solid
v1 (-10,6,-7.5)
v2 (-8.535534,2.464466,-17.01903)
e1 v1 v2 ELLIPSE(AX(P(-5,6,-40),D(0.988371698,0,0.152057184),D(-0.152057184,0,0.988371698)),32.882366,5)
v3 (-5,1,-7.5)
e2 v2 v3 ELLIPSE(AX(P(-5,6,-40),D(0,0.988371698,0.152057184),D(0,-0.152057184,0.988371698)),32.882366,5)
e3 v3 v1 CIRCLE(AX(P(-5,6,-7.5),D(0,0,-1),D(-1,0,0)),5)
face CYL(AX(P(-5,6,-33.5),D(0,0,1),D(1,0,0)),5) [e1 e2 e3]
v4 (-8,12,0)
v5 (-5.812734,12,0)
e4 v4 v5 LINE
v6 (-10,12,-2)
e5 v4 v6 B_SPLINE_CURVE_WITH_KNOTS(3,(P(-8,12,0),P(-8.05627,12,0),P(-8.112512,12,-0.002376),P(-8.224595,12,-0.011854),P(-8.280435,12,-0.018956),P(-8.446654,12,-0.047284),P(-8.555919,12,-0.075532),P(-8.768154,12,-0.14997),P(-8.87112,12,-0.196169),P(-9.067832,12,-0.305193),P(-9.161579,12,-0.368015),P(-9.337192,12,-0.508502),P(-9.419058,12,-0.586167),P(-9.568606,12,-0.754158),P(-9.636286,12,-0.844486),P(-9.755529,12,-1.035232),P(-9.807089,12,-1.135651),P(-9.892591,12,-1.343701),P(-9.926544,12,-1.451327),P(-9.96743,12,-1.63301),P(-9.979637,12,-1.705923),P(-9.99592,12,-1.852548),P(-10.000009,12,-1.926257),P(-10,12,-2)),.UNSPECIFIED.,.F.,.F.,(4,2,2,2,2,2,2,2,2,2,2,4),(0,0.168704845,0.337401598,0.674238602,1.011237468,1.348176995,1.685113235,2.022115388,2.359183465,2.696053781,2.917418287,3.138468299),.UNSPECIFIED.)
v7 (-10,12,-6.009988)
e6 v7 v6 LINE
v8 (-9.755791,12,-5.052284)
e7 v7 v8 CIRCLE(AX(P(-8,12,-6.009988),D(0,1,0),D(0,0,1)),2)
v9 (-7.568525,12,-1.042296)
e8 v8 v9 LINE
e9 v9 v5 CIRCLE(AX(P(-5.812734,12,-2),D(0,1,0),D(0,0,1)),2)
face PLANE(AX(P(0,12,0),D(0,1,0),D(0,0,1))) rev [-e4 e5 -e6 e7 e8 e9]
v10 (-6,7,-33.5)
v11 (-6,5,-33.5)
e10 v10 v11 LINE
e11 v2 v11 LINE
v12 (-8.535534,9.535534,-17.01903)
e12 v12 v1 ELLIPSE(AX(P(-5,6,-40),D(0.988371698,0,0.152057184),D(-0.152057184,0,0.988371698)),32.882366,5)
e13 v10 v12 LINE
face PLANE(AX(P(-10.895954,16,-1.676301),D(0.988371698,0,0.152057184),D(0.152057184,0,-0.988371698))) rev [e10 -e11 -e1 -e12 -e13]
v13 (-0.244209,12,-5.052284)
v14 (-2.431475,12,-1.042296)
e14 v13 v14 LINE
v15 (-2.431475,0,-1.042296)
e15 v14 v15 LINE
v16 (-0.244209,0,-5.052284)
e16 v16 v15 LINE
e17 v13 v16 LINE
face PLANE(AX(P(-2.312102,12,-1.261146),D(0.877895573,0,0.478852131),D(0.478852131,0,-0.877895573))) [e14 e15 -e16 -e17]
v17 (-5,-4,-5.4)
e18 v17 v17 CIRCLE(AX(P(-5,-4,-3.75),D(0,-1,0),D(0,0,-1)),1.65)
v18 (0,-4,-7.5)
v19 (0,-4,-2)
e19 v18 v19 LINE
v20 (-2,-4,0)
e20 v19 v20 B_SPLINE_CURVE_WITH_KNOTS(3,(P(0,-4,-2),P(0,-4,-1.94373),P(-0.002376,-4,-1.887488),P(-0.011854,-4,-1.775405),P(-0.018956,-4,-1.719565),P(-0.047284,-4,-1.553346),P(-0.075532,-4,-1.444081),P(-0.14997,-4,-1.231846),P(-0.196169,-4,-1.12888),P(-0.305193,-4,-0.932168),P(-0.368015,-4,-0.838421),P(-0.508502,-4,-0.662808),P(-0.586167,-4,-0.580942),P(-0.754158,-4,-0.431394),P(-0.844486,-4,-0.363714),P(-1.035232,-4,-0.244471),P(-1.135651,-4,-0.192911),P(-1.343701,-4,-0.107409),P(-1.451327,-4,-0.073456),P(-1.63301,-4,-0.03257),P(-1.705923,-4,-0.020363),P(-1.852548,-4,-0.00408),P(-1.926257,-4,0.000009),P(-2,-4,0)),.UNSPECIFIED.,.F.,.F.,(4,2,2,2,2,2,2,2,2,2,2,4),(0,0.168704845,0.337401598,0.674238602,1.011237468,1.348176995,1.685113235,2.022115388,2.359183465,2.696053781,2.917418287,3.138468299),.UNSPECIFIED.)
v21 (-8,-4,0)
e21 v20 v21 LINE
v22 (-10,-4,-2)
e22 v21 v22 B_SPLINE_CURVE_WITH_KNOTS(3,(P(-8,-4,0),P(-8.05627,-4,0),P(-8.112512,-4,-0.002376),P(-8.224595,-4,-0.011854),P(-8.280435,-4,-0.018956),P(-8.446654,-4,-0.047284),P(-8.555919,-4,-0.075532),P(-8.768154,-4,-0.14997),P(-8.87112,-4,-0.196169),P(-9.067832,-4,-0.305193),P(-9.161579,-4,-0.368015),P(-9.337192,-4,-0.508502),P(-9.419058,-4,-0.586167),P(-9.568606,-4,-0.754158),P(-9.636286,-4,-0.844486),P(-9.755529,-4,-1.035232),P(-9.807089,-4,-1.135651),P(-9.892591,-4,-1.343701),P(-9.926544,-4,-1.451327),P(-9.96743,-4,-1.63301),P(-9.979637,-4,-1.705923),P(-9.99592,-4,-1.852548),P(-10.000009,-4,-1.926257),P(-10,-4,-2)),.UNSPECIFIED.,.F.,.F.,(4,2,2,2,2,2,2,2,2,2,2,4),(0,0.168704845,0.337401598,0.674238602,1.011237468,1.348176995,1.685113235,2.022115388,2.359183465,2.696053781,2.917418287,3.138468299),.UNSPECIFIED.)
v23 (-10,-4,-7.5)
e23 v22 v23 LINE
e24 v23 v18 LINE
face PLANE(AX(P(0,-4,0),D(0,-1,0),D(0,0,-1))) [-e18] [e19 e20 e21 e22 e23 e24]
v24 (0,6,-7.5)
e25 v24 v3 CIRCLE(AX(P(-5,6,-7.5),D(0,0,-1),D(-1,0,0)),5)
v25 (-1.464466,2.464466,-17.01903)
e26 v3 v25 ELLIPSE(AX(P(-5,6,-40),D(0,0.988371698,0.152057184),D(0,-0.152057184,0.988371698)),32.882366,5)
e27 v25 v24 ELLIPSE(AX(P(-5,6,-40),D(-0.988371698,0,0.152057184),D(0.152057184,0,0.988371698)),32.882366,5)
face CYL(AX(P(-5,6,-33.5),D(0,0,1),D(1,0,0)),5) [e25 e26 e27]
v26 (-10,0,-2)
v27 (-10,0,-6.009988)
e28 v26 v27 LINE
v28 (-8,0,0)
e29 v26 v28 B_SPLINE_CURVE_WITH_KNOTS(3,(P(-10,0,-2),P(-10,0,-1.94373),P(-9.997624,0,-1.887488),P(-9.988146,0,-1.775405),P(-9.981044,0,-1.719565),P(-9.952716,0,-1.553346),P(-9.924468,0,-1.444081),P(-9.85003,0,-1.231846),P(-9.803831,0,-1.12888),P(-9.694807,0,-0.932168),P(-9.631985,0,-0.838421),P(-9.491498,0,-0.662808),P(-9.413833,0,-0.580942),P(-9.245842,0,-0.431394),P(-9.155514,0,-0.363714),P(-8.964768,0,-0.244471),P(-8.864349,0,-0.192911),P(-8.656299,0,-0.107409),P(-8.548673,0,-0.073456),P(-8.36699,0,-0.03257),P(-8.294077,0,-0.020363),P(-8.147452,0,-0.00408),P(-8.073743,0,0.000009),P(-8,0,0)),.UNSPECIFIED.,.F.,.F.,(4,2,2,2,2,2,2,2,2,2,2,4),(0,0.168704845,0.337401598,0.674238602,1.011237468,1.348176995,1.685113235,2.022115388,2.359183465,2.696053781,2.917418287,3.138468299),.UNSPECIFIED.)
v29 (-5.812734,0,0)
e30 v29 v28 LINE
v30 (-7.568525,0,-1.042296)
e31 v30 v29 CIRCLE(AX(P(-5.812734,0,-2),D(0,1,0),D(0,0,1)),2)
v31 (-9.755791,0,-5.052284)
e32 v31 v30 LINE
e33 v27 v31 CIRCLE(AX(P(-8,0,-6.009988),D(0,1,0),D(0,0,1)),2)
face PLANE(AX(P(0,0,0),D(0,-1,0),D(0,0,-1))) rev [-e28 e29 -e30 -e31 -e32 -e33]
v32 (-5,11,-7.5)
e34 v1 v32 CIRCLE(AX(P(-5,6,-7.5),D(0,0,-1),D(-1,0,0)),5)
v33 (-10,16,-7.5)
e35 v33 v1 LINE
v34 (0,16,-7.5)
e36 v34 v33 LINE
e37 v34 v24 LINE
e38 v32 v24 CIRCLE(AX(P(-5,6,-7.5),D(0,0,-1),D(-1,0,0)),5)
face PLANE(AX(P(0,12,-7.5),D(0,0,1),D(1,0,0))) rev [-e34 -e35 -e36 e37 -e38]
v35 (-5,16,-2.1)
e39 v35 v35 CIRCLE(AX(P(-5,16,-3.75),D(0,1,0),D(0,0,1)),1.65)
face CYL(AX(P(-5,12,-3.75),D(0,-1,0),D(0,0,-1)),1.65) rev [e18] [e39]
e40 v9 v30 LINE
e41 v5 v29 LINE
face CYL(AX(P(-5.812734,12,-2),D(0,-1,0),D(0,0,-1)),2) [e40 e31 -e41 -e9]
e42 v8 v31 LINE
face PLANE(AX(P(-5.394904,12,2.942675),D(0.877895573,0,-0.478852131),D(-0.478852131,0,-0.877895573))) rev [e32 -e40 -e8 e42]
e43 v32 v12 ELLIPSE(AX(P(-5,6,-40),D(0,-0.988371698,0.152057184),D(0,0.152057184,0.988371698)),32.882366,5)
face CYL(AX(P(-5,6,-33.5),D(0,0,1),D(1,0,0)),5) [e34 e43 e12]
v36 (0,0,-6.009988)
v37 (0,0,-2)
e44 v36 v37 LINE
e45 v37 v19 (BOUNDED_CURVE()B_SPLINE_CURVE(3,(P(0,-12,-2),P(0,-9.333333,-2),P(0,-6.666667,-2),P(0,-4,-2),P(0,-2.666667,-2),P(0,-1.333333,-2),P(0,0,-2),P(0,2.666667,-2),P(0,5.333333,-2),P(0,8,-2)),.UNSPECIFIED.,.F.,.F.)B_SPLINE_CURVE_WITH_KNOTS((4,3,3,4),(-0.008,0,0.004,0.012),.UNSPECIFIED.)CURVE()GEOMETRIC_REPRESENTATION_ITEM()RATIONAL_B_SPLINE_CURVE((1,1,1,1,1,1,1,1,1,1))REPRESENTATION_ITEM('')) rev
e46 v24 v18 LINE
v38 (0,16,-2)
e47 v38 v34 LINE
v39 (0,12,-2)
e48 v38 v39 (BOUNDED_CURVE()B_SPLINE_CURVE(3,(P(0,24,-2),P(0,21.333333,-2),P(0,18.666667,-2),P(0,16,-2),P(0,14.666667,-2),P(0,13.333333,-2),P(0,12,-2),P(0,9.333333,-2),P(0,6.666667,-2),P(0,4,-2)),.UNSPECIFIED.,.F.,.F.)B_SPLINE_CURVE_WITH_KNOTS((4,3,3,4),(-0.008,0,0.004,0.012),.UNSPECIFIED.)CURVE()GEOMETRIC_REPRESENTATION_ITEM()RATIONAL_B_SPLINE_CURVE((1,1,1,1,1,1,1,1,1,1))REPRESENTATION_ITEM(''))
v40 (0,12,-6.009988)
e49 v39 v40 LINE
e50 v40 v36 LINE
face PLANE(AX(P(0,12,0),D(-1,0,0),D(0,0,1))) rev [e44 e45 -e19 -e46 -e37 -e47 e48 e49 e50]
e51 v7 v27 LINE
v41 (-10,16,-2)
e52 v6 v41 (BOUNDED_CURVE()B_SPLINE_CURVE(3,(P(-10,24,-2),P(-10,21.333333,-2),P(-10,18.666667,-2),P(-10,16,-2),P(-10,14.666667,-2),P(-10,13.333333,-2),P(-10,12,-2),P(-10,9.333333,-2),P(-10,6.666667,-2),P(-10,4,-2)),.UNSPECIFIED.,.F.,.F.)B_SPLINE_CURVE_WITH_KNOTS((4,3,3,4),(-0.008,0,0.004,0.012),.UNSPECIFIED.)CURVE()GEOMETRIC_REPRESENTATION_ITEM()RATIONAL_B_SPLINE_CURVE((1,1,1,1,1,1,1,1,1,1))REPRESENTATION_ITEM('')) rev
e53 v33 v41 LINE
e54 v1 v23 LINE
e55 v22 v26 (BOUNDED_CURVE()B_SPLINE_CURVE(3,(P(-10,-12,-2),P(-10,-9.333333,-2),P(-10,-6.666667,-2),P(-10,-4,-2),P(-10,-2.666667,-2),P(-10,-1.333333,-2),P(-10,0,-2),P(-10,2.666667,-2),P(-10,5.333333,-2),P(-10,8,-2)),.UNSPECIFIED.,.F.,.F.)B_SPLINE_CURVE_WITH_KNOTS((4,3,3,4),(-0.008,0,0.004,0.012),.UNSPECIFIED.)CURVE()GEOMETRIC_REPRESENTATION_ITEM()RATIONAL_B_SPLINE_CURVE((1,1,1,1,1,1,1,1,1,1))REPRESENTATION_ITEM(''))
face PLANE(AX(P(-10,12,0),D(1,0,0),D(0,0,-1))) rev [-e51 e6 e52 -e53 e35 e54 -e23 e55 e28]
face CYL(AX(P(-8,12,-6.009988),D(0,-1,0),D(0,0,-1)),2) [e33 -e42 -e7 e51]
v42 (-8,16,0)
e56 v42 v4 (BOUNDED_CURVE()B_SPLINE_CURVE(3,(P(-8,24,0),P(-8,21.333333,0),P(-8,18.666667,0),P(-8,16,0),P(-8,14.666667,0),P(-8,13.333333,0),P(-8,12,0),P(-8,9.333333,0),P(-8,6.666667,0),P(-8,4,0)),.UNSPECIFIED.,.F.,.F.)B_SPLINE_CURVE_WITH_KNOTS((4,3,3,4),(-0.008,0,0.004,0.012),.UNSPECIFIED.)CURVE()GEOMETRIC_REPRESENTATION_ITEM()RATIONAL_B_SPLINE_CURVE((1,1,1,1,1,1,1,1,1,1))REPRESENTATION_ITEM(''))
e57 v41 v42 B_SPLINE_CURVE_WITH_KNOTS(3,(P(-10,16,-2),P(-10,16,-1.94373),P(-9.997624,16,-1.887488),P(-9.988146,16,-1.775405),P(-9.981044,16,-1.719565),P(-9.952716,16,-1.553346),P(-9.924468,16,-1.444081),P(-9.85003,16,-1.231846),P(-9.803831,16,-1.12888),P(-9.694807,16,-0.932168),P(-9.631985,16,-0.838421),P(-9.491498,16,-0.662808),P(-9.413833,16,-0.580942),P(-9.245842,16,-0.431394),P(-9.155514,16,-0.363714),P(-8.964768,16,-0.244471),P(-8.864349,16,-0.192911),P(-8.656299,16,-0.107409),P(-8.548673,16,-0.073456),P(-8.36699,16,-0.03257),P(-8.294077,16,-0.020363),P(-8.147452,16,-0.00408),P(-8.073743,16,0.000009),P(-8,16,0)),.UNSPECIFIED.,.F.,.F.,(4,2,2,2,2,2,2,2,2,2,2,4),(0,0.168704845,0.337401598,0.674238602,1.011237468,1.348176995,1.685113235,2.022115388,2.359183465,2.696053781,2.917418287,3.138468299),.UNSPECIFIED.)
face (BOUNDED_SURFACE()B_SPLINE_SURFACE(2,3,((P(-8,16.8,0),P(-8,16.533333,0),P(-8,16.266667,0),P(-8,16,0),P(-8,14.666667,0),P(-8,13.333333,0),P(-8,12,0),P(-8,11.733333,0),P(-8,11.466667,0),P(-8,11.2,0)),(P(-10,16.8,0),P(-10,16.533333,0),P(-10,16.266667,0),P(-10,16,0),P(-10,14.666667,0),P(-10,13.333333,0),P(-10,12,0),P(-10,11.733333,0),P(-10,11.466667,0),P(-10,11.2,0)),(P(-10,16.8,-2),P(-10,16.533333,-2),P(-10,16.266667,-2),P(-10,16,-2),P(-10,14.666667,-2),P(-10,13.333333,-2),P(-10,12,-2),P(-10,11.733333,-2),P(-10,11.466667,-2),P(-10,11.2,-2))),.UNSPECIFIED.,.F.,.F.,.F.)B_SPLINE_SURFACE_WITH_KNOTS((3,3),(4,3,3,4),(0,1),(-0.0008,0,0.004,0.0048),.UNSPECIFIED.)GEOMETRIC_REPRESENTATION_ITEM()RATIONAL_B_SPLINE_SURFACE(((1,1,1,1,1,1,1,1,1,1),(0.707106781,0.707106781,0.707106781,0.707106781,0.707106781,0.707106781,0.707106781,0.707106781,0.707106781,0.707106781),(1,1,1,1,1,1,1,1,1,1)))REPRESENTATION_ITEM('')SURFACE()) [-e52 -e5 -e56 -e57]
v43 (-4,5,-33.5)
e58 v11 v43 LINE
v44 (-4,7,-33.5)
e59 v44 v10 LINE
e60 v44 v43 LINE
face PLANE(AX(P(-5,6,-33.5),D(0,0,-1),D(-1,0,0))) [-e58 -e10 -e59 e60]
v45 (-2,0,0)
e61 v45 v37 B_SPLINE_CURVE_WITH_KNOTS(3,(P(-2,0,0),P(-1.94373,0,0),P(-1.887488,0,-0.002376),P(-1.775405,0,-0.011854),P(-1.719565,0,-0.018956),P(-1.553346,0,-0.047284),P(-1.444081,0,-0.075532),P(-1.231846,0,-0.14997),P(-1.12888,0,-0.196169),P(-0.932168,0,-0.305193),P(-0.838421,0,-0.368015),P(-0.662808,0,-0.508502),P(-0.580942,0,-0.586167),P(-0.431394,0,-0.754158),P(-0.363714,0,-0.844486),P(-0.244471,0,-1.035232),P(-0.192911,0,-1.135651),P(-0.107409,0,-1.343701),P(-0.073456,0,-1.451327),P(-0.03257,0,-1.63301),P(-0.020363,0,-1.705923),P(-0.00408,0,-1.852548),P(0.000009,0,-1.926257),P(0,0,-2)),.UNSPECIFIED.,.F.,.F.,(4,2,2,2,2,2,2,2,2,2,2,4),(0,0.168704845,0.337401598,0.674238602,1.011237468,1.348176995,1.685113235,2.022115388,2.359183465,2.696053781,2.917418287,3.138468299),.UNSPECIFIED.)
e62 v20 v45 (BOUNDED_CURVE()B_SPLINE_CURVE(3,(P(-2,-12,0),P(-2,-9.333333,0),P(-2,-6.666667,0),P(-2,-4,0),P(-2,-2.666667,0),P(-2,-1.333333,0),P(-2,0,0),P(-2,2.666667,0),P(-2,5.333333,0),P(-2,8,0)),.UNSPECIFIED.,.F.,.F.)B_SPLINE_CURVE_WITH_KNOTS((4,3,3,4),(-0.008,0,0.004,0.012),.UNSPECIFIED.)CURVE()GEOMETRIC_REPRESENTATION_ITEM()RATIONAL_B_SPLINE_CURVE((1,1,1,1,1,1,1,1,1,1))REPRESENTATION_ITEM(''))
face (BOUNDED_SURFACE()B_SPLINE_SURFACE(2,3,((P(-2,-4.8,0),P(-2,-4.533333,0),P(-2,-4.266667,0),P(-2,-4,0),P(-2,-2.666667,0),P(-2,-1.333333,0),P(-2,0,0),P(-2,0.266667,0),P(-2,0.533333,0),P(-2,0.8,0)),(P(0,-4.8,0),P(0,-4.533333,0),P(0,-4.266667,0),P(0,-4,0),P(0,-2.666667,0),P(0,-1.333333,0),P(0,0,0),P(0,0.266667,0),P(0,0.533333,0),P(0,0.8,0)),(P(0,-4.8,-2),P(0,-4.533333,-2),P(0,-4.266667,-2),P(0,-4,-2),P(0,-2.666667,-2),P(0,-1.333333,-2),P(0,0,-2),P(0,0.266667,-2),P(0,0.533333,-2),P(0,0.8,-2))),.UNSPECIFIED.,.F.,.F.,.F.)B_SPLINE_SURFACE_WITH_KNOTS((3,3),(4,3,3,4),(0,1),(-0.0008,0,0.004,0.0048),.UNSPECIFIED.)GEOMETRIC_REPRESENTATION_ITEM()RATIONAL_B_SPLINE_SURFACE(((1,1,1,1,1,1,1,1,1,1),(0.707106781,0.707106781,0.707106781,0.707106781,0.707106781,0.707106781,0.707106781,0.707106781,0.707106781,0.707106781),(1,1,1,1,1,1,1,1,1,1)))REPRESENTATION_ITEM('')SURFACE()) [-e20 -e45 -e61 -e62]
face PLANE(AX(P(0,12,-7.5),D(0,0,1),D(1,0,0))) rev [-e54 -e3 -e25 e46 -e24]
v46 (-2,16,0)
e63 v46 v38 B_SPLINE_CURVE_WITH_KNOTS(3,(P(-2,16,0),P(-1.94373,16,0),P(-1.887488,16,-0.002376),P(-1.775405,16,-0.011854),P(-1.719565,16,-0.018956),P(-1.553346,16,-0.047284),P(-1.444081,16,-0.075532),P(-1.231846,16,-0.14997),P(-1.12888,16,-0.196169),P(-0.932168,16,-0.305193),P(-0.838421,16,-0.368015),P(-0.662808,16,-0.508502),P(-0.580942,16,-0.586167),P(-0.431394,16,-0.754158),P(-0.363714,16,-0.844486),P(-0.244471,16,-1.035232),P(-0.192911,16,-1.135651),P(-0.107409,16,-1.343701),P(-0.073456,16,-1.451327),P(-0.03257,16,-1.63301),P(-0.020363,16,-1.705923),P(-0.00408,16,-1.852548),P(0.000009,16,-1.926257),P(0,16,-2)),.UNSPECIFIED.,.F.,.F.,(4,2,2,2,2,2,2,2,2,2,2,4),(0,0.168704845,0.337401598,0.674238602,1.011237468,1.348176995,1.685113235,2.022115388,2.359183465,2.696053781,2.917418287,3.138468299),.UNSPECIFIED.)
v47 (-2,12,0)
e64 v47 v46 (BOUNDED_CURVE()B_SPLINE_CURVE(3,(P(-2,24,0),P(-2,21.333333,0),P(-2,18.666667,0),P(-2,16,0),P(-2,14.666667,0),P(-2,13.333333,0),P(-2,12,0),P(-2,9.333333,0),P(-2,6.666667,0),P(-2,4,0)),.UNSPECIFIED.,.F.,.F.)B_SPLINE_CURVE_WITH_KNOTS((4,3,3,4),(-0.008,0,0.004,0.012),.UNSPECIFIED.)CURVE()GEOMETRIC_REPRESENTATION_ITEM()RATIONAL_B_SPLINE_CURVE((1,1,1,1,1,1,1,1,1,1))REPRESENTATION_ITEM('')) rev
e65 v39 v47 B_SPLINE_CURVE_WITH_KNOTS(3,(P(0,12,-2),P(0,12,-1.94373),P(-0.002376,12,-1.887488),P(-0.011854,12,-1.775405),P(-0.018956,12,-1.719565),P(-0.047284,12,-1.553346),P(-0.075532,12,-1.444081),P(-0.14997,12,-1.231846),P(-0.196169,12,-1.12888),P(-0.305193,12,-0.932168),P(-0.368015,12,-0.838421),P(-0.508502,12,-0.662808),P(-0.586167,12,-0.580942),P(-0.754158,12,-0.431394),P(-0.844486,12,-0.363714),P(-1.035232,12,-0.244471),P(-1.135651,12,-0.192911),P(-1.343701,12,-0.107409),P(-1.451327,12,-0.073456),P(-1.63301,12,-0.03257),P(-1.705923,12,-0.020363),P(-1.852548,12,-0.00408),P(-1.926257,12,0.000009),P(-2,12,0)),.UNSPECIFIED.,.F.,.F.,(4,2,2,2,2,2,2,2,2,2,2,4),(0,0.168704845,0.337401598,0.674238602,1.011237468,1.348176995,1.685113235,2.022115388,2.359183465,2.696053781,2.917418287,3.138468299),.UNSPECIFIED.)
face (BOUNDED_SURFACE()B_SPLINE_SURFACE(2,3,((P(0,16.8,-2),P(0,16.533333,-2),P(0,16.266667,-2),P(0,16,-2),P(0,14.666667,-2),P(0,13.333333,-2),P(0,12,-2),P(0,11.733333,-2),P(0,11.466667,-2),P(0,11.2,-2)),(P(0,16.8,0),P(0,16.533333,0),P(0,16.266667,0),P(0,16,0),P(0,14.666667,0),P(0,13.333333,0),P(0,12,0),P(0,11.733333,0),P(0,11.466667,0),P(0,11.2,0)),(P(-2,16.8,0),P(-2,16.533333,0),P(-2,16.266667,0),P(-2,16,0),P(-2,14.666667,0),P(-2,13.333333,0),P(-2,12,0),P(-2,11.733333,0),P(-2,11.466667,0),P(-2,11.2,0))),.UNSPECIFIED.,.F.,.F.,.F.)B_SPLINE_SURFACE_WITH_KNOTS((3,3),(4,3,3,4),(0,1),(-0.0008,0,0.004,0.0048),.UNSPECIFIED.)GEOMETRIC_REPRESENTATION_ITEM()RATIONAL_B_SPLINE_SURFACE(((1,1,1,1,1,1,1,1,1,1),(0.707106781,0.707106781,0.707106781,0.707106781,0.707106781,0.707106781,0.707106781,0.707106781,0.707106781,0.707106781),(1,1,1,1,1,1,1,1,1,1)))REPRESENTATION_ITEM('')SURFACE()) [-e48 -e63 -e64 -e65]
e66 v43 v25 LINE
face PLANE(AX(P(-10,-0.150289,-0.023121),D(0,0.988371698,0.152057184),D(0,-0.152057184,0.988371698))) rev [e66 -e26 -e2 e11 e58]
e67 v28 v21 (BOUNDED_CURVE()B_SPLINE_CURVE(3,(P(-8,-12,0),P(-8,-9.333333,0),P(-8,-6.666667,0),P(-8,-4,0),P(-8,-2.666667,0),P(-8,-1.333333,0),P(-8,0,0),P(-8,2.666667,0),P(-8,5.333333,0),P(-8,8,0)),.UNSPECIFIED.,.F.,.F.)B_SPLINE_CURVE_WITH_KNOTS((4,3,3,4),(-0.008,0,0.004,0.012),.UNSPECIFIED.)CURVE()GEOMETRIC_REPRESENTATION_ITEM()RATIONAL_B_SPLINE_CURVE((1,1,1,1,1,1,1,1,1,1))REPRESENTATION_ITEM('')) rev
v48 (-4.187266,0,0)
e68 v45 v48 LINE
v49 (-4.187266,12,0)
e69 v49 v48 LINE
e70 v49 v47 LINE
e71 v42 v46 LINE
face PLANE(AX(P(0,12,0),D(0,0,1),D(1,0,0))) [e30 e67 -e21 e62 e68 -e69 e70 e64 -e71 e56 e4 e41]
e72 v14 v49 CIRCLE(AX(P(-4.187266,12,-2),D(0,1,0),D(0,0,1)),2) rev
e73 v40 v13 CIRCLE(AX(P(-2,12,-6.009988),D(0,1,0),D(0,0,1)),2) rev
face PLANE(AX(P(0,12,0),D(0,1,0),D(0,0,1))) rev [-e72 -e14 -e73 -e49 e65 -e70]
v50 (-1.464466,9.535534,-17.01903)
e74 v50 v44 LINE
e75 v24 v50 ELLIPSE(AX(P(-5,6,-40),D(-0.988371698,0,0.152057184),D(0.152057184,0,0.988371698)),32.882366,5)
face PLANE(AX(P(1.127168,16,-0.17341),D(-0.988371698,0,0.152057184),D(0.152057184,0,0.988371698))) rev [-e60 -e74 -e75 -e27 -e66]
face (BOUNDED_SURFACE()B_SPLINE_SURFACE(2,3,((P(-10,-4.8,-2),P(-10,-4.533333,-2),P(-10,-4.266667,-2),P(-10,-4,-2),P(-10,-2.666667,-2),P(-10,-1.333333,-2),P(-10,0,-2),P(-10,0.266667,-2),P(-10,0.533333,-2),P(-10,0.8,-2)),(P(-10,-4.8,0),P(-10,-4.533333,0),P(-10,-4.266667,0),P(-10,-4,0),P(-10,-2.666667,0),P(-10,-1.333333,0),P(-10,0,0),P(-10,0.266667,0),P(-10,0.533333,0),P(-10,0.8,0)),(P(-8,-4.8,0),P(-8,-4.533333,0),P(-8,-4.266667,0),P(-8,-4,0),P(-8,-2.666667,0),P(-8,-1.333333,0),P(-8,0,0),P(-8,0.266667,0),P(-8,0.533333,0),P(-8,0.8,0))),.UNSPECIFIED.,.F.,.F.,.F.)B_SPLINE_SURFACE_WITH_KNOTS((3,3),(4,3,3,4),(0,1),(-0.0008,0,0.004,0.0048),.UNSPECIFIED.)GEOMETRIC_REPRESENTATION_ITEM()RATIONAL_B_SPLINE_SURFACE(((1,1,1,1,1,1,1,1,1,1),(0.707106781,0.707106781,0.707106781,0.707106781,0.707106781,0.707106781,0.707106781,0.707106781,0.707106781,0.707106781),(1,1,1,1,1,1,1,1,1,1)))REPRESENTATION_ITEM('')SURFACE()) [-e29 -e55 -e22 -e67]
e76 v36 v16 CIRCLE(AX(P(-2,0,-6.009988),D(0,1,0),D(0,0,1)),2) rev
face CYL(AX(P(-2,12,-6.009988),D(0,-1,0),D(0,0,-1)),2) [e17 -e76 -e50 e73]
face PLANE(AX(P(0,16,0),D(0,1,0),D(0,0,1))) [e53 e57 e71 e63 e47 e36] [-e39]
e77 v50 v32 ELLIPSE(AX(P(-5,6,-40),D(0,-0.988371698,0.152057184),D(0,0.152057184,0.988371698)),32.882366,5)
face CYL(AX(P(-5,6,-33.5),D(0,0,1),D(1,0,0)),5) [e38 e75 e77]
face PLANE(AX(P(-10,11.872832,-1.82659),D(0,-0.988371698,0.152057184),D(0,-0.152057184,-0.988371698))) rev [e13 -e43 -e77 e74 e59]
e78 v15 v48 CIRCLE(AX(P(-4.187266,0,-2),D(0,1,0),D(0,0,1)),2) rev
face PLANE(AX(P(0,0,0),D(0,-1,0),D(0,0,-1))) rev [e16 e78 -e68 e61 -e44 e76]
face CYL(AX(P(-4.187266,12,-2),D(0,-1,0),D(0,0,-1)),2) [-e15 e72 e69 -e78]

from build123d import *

# Parameters (mm, degrees)
SKETCH1_R           = 1.65
BOSS_EXTRUDE1_DEPTH = 12
BOSS_EXTRUDE2_START = 4
SKETCH2_W           = 10
SKETCH2_H           = 7.5
SKETCH2_R           = 1.65
BOSS_EXTRUDE2_DEPTH = 4
SKETCH3_W           = 10
SKETCH3_H           = 7.5
SKETCH3_R           = 1.65
BOSS_EXTRUDE3_DEPTH = 4
SKETCH4_R           = 5
BOSS_EXTRUDE4_DEPTH = 26
CUT_EXTRUDE1_DEPTH  = 39.448016854
CUT_EXTRUDE2_DEPTH  = 41.277164746
VARFILLET1_R        = 2


with BuildPart() as part:
    # Sketch1 → Boss-Extrude1 (new body)
    with BuildSketch(Plane(origin=(0, 0, 0), x_dir=(1, 0, 0), z_dir=(0, 1, 0))):
        with BuildLine():
            Line((-10, 7.5), (-10, 6.009988029))
            ThreePointArc((-10, 6.009988029), (-9.937986364, 5.515813106), (-9.755791146, 5.052283767))
            Line((-9.755791146, 5.052283767), (-7.568524948, 1.042295739))
            ThreePointArc((-7.568524948, 1.042295739), (-6.833662663, 0.280202261), (-5.812733803, 0))
            Line((-5.812733803, 0), (-4.187266197, 0))
            ThreePointArc((-4.187266197, 0), (-3.166337337, 0.280202261), (-2.431475052, 1.042295739))
            Line((-2.431475052, 1.042295739), (-0.244208854, 5.052283767))
            ThreePointArc((-0.244208854, 5.052283767), (-0.062013636, 5.515813106), (0, 6.009988029))
            Line((0, 6.009988029), (0, 7.5))
            Line((0, 7.5), (-10, 7.5))
        make_face()
        with Locations((-5, 3.75)):
            Circle(SKETCH1_R, mode=Mode.SUBTRACT)
    extrude(amount=BOSS_EXTRUDE1_DEPTH)

    # Sketch2 → Boss-Extrude2 (add)
    with BuildSketch(Plane.XZ.offset(BOSS_EXTRUDE2_START)):
        with Locations((-5, -3.75)):
            Rectangle(SKETCH2_W, SKETCH2_H)
        with Locations((-5, -3.75)):
            Circle(SKETCH2_R, mode=Mode.SUBTRACT)
    extrude(amount=-BOSS_EXTRUDE2_DEPTH)

    # Sketch3 → Boss-Extrude3 (add)
    with BuildSketch(Plane(origin=(0, 12, 0), x_dir=(1, 0, 0), z_dir=(0, 1, 0))):
        with Locations((-5, 3.75)):
            Rectangle(SKETCH3_W, SKETCH3_H)
        with Locations((-5, 3.75)):
            Circle(SKETCH3_R, mode=Mode.SUBTRACT)
    extrude(amount=BOSS_EXTRUDE3_DEPTH)

    # Sketch4 → Boss-Extrude4 (add)
    with BuildSketch(Plane(origin=(0, 0, -7.5), x_dir=(-1, 0, 0), z_dir=(0, 0, -1))):
        with Locations((5, 6)):
            Circle(SKETCH4_R)
    extrude(amount=BOSS_EXTRUDE4_DEPTH)

    # Sketch5 → Cut-Extrude1 (cut, through all)
    with BuildSketch(Plane(origin=(0, 0, 0), x_dir=(0, 0, -1), z_dir=(1, 0, 0))):
        Polygon((33.5, 11), (7.5, 11), (33.5, 7), align=None)
        Polygon((33.5, 1), (33.5, 5), (7.5, 1), align=None)
    extrude(amount=-CUT_EXTRUDE1_DEPTH, mode=Mode.SUBTRACT)

    # Sketch6 → Cut-Extrude2 (cut, through all)
    with BuildSketch(Plane(origin=(0, -4, 0), x_dir=(-1, 0, 0), z_dir=(0, -1, 0))):
        Polygon((0, 7.5), (4, 33.5), (0, 33.5), align=None)
        Polygon((10, 33.5), (6, 33.5), (10, 7.5), align=None)
    extrude(amount=-CUT_EXTRUDE2_DEPTH, mode=Mode.SUBTRACT)

    # VarFillet1
    varfillet1_edges = [part.edges().sort_by_distance(p)[0] for p in [
        (0, 14, 0),
        (-10, 14, 0),
        (-10, -2, 0),
        (0, -2, 0),
    ]]
    fillet(varfillet1_edges, radius=VARFILLET1_R)


solid = part.part
